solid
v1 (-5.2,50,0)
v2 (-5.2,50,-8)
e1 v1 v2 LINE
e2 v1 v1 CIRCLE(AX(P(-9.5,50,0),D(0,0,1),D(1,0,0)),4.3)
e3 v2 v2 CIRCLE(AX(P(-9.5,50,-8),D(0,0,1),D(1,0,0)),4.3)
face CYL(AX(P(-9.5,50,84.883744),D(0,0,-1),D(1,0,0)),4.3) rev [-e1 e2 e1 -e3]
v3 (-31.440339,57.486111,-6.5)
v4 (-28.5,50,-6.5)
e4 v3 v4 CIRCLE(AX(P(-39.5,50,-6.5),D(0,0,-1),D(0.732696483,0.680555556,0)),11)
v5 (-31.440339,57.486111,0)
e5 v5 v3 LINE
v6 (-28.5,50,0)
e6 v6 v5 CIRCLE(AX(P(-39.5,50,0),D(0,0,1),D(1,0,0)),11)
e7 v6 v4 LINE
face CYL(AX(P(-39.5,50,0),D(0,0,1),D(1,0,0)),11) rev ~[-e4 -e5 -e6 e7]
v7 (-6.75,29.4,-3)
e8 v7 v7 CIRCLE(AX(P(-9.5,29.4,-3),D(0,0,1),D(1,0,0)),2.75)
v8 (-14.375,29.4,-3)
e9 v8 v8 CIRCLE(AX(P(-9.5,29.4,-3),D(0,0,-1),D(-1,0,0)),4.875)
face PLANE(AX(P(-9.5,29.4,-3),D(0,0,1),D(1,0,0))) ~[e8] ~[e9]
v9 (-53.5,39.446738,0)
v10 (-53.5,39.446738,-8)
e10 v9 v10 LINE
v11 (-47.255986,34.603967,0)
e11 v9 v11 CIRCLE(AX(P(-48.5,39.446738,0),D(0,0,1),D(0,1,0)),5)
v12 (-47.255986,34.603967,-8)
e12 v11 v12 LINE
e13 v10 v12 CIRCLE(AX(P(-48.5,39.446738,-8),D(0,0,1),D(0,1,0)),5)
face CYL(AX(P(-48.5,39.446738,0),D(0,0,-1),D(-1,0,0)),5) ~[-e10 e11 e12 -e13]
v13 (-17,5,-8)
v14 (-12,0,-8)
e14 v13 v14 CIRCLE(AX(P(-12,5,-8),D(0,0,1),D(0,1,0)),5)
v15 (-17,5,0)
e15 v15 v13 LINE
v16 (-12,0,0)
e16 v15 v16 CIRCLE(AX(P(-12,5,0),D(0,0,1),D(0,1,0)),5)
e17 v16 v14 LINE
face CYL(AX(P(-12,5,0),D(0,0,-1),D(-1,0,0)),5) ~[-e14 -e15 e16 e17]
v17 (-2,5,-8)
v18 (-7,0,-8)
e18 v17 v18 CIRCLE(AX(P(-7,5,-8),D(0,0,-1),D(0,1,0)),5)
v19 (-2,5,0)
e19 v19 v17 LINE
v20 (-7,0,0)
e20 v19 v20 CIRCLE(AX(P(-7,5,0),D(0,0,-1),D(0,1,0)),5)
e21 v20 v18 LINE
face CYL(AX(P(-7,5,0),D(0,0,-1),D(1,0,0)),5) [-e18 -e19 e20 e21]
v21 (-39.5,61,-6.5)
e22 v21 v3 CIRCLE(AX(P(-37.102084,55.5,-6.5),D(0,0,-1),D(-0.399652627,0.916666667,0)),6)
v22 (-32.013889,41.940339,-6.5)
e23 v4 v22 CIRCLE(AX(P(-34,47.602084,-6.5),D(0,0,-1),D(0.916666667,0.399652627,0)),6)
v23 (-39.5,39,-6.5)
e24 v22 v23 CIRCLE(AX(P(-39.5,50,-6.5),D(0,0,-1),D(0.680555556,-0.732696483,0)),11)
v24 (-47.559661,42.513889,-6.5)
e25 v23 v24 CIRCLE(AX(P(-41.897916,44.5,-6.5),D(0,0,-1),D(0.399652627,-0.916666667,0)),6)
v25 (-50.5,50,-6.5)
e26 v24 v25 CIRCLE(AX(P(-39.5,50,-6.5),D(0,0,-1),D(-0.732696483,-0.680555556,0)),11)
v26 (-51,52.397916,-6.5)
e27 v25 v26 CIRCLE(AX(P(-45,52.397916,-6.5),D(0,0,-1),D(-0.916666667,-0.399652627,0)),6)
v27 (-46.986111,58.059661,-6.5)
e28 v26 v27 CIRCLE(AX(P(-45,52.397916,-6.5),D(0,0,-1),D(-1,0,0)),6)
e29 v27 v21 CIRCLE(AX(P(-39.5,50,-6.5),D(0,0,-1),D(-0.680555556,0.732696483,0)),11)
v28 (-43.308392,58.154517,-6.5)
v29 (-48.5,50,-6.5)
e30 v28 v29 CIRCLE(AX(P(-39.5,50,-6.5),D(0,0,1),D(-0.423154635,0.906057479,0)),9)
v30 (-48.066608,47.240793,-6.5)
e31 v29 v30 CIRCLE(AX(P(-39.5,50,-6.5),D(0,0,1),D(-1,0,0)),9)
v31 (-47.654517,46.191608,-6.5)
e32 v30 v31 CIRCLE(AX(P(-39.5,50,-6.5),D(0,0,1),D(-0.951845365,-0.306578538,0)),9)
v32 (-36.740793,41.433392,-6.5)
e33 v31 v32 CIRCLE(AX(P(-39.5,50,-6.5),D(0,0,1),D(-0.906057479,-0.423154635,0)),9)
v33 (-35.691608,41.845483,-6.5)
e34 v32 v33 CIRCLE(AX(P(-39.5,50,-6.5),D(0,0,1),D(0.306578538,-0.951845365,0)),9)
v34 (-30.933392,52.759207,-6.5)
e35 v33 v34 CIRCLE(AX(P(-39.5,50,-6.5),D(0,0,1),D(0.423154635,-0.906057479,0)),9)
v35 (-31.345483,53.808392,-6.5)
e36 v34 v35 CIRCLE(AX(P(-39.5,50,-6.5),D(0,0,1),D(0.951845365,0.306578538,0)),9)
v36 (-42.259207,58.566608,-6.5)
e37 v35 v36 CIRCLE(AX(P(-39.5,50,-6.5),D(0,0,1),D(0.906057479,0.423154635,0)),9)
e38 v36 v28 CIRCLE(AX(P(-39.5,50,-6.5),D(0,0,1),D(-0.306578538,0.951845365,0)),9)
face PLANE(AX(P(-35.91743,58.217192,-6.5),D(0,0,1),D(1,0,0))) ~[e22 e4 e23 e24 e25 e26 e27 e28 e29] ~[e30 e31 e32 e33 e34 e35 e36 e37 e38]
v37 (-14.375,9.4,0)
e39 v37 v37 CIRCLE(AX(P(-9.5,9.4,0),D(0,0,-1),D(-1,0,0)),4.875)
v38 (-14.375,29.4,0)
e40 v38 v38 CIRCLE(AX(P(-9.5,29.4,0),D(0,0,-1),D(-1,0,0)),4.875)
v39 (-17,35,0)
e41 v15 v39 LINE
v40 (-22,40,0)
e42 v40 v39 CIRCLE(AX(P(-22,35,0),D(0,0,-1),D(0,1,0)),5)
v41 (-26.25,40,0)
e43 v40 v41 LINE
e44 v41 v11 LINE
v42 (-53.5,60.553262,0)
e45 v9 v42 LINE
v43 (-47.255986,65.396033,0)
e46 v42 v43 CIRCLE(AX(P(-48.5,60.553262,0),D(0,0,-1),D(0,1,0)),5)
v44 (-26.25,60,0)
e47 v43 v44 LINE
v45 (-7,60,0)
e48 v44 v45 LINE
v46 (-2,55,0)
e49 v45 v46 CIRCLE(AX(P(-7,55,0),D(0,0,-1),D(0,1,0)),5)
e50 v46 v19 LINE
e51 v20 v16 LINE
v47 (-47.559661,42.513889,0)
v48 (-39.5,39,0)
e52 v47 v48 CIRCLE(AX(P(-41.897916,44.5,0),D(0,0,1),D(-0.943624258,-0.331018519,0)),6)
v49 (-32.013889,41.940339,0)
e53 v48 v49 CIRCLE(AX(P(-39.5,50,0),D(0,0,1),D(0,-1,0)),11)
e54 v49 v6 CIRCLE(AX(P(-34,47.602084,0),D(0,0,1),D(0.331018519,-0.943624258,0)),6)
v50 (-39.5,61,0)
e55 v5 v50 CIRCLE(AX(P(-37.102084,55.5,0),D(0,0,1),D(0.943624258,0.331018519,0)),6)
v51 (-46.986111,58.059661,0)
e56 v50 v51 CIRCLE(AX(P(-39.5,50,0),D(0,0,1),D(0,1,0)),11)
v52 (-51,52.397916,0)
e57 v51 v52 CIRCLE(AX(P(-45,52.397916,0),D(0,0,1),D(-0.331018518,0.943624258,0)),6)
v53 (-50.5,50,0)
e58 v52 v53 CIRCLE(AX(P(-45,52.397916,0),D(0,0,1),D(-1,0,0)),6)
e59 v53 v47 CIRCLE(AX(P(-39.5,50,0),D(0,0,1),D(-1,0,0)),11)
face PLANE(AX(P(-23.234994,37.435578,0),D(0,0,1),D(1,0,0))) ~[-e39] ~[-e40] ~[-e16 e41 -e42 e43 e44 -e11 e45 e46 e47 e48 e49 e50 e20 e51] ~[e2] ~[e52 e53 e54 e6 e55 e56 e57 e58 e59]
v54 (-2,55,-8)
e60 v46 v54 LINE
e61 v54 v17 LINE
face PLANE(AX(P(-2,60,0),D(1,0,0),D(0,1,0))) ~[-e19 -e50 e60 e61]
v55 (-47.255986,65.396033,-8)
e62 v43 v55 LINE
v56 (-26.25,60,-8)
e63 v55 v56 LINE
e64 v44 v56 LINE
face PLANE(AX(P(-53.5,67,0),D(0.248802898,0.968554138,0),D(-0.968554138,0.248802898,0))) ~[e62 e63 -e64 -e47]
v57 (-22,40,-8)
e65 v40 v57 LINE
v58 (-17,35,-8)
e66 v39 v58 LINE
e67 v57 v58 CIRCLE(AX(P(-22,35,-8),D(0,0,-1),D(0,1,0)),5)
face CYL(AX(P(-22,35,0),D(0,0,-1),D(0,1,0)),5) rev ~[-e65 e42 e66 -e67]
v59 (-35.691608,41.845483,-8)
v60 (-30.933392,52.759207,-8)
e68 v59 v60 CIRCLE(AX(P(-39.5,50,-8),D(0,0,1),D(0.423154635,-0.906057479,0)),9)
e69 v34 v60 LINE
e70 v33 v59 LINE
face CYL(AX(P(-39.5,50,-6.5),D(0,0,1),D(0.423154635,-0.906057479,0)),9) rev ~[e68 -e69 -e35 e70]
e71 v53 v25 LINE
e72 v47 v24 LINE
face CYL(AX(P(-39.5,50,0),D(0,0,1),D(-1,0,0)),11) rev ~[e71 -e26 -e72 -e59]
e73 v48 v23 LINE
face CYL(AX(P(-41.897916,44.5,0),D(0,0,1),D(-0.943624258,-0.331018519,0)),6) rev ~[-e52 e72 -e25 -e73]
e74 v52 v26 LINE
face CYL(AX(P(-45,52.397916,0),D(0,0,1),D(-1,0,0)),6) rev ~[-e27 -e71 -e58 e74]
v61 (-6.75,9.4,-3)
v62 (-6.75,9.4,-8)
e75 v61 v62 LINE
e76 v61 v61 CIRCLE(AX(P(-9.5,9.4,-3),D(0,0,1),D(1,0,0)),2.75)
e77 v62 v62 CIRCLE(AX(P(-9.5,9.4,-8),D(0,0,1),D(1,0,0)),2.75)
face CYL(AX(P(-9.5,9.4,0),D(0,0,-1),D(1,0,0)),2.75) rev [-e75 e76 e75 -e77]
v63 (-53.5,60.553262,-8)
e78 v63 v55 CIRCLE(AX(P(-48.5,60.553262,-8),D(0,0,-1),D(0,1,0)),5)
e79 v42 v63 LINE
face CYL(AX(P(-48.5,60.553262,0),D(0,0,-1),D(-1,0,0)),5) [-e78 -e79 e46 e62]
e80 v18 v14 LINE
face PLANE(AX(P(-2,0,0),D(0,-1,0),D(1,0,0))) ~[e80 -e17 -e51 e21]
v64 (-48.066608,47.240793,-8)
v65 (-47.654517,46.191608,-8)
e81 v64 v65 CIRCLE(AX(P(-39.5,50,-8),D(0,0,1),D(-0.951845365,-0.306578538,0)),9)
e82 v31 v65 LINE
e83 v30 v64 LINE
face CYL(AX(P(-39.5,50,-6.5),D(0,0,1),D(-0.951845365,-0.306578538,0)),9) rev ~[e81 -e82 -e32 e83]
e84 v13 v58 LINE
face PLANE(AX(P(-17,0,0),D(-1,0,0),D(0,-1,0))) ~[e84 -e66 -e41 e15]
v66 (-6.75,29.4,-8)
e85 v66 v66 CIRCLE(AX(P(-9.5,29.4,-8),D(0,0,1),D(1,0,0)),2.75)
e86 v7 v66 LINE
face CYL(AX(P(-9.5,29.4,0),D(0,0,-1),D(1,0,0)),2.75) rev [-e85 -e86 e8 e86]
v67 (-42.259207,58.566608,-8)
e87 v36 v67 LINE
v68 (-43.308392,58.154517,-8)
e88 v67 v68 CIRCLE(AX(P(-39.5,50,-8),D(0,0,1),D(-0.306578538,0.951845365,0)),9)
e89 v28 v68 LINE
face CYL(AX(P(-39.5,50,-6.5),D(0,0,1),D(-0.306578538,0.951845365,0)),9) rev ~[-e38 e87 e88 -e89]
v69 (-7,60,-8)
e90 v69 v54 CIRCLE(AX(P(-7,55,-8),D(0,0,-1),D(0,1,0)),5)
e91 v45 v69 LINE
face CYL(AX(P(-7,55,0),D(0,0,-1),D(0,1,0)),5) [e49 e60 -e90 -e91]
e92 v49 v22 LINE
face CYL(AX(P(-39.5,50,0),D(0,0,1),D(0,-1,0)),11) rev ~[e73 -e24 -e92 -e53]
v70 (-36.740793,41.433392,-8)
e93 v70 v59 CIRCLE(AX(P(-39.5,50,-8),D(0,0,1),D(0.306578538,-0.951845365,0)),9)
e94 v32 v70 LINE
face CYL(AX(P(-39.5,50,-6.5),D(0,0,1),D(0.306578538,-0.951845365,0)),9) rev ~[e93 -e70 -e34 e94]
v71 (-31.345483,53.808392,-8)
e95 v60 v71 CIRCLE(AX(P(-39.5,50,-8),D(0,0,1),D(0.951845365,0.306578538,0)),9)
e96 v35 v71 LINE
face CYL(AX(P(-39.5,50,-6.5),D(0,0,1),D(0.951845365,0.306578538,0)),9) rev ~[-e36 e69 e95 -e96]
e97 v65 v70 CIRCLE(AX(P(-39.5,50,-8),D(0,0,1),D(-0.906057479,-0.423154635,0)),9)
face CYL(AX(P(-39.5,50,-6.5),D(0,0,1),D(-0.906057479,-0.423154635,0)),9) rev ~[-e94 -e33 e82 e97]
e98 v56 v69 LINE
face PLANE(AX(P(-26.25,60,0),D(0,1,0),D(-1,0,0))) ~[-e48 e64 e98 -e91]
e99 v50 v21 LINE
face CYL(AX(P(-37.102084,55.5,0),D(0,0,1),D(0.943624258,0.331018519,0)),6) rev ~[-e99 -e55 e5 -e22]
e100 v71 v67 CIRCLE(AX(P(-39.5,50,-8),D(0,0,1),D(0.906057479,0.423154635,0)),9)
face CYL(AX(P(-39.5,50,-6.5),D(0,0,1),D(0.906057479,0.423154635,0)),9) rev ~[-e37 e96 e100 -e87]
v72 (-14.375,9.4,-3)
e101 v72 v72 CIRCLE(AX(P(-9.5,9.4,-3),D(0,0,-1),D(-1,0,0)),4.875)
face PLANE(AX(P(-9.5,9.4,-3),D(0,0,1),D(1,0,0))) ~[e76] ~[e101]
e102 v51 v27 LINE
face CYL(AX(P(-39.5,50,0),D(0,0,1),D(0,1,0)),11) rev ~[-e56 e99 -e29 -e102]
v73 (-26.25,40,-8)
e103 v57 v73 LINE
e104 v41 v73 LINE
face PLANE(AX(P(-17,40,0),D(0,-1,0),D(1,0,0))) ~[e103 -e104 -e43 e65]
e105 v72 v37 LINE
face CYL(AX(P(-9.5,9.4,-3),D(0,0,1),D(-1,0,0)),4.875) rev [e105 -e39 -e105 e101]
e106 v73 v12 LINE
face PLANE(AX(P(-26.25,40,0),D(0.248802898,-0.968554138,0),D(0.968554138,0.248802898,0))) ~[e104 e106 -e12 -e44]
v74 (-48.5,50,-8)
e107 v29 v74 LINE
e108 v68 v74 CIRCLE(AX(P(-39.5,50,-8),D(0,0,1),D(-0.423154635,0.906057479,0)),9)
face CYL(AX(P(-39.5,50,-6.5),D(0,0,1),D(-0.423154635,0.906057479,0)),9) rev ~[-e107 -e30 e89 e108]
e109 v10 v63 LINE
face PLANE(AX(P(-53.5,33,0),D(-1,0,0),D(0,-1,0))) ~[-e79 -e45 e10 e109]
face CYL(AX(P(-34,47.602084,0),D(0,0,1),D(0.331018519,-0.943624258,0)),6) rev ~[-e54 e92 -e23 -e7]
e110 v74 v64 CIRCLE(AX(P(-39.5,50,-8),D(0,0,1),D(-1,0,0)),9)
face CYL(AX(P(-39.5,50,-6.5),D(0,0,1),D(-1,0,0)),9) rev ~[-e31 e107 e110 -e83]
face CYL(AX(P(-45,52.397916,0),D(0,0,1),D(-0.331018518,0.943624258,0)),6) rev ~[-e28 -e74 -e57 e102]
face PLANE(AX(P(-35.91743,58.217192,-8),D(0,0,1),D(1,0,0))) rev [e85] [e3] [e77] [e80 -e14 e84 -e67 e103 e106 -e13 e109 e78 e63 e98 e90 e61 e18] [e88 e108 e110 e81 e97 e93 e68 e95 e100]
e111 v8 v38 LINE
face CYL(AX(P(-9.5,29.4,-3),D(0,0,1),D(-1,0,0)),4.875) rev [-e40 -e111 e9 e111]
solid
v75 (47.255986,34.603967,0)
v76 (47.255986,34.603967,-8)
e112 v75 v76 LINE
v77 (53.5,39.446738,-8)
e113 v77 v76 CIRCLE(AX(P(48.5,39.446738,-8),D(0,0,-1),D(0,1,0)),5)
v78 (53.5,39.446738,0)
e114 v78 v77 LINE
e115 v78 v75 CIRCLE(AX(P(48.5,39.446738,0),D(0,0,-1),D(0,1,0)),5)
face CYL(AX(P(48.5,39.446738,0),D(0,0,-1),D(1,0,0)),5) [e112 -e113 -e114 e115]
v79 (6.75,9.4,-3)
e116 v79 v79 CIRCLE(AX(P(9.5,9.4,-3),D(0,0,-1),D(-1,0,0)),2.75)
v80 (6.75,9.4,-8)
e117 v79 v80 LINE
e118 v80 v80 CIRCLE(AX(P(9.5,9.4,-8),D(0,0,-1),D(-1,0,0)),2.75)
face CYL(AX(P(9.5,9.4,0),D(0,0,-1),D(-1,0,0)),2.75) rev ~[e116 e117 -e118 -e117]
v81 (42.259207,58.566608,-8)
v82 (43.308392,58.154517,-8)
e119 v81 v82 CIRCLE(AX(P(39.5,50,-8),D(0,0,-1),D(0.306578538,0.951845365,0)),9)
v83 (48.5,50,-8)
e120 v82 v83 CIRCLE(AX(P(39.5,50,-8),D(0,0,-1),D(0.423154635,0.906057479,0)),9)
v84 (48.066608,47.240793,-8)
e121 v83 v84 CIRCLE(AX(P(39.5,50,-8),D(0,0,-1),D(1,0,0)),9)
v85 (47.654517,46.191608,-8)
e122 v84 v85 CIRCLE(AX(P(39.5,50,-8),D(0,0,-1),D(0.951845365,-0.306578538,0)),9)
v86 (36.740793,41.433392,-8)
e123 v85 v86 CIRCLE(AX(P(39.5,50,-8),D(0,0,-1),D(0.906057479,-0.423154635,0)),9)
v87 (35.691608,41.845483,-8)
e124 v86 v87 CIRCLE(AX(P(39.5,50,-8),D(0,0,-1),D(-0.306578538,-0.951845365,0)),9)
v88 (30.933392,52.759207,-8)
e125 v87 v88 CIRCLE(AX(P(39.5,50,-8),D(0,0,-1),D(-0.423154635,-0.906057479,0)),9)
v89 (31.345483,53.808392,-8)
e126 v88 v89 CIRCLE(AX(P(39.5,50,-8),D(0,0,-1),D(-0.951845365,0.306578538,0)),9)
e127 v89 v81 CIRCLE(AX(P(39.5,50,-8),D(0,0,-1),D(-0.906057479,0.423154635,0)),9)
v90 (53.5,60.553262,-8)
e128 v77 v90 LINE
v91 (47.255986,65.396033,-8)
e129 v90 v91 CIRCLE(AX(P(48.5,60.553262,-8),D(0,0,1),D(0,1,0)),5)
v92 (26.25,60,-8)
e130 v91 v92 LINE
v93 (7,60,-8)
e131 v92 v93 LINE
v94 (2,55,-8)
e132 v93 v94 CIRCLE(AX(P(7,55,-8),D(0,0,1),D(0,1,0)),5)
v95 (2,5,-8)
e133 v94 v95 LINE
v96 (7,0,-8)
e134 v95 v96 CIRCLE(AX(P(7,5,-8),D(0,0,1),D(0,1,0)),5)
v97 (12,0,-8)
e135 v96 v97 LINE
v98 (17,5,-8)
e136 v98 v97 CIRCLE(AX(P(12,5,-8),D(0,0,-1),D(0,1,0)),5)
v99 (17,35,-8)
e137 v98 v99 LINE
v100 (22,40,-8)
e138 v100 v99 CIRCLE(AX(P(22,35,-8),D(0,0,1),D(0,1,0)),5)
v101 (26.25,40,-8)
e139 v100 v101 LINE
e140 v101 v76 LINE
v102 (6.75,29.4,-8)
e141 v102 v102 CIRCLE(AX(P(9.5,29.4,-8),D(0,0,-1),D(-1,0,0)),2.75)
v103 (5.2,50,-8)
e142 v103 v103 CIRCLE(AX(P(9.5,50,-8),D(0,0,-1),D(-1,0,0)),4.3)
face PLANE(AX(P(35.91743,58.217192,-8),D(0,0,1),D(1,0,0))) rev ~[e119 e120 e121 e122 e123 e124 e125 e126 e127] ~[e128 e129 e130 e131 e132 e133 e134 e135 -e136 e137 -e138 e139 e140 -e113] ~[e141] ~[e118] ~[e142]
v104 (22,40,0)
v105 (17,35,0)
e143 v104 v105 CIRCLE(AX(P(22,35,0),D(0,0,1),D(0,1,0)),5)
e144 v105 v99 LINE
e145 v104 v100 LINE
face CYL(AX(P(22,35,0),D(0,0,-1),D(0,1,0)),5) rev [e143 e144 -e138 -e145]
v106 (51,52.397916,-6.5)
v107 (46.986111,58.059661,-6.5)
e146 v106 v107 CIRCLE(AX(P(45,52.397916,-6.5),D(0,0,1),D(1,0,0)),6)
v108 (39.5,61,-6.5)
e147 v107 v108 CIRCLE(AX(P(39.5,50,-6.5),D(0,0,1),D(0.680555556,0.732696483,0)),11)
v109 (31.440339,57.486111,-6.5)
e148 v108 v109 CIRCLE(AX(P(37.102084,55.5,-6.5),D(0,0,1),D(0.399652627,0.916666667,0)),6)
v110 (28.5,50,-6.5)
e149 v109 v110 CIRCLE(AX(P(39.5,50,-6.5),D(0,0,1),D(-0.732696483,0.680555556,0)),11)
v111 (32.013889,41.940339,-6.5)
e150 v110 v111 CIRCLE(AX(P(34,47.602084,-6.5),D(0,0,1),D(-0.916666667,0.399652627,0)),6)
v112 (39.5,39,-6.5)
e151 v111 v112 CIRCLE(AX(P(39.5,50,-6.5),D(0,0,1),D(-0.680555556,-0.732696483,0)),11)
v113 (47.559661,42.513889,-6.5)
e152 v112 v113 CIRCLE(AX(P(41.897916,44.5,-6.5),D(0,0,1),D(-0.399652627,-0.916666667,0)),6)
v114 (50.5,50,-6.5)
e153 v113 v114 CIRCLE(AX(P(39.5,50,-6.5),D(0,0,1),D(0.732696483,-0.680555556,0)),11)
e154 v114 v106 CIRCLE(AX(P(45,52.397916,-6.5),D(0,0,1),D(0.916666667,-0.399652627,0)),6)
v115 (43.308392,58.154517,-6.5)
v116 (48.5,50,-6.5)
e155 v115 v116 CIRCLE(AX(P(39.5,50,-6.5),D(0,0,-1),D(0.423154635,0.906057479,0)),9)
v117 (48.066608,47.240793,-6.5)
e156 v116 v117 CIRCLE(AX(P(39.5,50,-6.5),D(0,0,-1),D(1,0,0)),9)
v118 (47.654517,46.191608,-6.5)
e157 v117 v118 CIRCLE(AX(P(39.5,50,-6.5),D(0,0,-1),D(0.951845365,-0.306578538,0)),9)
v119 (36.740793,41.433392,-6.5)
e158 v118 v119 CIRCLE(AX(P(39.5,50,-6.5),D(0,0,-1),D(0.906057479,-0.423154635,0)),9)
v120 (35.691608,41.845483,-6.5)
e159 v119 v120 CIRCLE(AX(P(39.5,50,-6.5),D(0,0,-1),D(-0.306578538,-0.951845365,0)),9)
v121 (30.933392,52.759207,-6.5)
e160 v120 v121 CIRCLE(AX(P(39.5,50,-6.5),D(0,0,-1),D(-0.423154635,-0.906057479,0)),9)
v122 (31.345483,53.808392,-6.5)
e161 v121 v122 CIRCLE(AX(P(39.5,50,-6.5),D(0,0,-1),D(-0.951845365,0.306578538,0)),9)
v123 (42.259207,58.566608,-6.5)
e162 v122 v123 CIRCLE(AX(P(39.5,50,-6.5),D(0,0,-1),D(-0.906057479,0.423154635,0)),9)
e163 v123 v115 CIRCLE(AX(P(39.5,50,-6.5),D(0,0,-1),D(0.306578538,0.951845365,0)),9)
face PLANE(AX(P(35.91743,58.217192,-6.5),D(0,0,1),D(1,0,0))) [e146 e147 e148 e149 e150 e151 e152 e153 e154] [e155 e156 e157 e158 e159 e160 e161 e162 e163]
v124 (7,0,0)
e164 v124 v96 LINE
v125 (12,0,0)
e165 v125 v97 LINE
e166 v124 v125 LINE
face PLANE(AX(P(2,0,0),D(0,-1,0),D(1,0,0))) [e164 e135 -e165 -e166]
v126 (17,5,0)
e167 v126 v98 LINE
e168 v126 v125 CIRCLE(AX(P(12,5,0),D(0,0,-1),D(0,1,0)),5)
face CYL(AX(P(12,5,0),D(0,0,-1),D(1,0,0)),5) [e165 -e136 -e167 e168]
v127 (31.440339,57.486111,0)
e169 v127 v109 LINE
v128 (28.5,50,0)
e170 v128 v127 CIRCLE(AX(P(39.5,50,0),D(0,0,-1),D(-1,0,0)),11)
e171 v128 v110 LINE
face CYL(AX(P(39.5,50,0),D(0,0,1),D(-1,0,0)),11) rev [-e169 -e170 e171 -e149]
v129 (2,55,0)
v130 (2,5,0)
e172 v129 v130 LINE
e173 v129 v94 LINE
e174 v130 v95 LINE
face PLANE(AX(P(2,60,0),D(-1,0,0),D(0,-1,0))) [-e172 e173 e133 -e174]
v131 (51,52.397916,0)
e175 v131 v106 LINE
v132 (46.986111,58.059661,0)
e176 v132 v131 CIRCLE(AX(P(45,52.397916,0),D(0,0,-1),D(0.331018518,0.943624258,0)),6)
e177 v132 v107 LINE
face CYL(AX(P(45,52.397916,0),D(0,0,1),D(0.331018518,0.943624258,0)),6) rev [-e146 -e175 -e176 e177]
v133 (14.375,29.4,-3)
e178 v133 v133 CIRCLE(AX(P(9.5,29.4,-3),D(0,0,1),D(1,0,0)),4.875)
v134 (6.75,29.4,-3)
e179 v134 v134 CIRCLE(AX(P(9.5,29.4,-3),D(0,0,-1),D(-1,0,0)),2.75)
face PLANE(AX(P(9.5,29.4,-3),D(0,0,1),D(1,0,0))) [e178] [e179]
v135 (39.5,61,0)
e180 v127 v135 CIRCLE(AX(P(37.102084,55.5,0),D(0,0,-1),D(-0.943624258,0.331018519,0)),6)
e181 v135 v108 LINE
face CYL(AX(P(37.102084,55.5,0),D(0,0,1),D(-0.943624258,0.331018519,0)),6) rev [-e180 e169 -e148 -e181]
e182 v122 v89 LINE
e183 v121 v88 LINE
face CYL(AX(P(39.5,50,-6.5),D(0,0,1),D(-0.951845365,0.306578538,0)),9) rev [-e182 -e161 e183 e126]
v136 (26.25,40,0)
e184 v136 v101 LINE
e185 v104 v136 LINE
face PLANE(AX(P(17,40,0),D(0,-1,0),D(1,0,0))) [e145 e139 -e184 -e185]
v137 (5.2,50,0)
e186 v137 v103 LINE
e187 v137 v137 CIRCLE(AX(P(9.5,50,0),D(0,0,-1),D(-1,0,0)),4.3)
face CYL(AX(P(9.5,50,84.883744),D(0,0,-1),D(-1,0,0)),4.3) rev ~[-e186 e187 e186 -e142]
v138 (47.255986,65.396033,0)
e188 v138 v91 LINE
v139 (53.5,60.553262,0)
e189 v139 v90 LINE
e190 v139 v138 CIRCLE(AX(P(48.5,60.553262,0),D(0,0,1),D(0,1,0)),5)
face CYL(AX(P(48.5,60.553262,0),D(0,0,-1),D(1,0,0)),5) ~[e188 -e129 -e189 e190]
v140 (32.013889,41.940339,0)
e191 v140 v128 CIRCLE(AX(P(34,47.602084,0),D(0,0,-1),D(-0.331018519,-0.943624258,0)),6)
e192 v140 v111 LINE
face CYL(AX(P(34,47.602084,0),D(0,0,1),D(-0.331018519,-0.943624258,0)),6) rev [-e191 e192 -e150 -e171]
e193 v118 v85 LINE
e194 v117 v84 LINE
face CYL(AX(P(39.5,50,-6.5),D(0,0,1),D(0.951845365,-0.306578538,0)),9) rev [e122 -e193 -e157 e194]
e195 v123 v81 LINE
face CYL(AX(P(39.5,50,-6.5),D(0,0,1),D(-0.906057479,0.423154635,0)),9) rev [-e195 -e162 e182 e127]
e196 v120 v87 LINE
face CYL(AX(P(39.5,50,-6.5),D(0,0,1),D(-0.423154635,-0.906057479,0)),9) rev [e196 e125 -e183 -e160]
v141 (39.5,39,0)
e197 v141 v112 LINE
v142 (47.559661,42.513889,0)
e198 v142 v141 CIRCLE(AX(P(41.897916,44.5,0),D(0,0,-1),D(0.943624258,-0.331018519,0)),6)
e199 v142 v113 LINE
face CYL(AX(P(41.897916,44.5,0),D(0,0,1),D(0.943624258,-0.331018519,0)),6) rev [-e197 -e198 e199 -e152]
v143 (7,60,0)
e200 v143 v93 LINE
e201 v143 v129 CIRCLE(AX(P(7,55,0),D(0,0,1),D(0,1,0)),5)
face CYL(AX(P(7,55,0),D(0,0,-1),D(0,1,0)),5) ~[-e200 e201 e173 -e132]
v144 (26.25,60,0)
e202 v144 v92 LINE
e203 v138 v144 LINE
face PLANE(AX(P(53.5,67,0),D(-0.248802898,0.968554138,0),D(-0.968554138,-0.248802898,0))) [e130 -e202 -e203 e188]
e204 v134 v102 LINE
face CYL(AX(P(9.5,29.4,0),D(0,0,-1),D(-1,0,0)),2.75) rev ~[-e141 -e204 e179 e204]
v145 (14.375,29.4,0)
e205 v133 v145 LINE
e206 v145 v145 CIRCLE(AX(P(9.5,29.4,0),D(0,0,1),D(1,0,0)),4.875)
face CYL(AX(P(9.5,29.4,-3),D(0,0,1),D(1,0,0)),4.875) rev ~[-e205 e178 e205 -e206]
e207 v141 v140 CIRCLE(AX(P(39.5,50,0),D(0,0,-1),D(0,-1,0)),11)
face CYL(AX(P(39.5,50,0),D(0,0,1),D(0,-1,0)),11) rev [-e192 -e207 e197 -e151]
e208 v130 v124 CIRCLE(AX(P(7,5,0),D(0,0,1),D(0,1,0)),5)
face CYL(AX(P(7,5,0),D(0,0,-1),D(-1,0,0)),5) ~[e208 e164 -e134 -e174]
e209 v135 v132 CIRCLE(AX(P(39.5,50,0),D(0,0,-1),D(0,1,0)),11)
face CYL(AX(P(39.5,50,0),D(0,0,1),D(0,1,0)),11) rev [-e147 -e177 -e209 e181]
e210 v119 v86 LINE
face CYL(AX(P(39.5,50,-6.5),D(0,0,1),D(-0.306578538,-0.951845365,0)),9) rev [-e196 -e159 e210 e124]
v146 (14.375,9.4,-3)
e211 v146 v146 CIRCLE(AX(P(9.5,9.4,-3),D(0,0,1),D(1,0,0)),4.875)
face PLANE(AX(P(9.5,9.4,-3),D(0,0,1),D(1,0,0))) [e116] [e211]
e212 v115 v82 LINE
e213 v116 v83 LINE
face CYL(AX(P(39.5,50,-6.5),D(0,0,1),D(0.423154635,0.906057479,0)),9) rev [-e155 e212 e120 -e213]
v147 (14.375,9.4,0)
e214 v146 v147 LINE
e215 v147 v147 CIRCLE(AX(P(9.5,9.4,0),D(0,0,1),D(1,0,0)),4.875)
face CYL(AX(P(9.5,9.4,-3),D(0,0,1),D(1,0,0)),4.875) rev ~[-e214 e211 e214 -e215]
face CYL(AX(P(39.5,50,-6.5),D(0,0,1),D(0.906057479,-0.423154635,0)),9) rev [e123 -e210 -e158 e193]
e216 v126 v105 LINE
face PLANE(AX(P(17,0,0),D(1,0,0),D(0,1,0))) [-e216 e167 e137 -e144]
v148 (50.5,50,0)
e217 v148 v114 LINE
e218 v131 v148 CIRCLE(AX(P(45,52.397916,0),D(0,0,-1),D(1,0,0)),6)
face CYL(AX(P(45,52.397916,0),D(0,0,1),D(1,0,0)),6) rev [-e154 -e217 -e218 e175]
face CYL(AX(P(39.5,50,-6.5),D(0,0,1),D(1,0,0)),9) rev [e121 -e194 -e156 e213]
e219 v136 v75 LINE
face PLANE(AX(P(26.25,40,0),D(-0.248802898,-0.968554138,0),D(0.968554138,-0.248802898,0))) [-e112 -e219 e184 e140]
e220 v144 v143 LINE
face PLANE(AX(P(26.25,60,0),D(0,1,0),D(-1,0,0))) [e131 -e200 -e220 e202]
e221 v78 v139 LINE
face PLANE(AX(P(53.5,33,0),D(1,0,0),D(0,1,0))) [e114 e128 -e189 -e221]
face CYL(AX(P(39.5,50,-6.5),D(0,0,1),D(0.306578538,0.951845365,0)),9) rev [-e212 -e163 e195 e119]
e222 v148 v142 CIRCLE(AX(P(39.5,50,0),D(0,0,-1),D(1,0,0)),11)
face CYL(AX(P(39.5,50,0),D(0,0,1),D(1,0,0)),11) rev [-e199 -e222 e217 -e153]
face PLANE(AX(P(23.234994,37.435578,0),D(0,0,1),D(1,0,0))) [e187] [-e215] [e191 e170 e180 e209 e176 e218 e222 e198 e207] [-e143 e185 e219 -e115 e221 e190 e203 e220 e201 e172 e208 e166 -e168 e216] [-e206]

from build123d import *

# Parameters (mm, degrees)
F1_DEPTH       = 8
F2_D           = 8.6
F3_D           = 5.5
F3_CBORE_D     = 9.75
F3_CBORE_DEPTH = 3
F4_R           = 5
F5_START       = -6.5
F5_DEPTH       = 1.5


# Not quite as in the source:
# - a feature names something its author has since deleted; it is built from what else it names


with BuildPart() as f1:
    # F0 (on Top) → F1 (new body)
    with BuildSketch(Plane.XY):
        Polygon((53.5, 33), (53.5, 67), (26.25, 60), (2, 60), (2, 40), (2, 0), (17, 0), (17, 40), (26.25, 40), align=None)
        with BuildLine():
            ThreePointArc((51, 52.3979157617), (50.8736700622, 51.1731708903), (50.5, 50))
            ThreePointArc((50.5, 50), (49.7385612859, 45.978574532), (47.55966131, 42.5138888889))
            ThreePointArc((47.55966131, 42.5138888889), (44.2958315233, 39), (39.5, 39))
            ThreePointArc((39.5, 39), (35.478574532, 39.7614387141), (32.0138888889, 41.94033869))
            ThreePointArc((32.0138888889, 41.94033869), (28.5, 45.2041684767), (28.5, 50))
            ThreePointArc((28.5, 50), (29.2614387141, 54.021425468), (31.44033869, 57.4861111111))
            ThreePointArc((31.44033869, 57.4861111111), (34.7041684767, 61), (39.5, 61))
            ThreePointArc((39.5, 61), (43.521425468, 60.2385612859), (46.9861111111, 58.05966131))
            ThreePointArc((46.9861111111, 58.05966131), (49.8947250519, 55.8680262306), (51, 52.3979157617))
        make_face(mode=Mode.SUBTRACT)
    extrude(amount=-F1_DEPTH)

    # F2 (through all)
    with Locations(Plane.XY):
        with Locations((9.5, 50)):
            Hole(F2_D / 2)

    # F3 (through all)
    with Locations(Plane.XY):
        with Locations((9.5, 29.4), (9.5, 9.4)):
            CounterBoreHole(F3_D / 2, F3_CBORE_D / 2, F3_CBORE_DEPTH)

    # F4
    f4_edges = [f1.edges().sort_by_distance(p)[0] for p in [
        (17, 0, -4),
        (2, 60, -4),
        (53.5, 33, -4),
        (53.5, 67, -4),
        (17, 40, -4),
        (2, 0, -4),
    ]]
    fillet(f4_edges, radius=F4_R)

    # F0 (on Top) → F5 (join)
    with BuildSketch(Plane.XY.offset(F5_START)):
        with BuildLine():
            ThreePointArc((42.2592068472, 58.5666082888), (41.0707112049, 60), (39.5, 61))
            ThreePointArc((39.5, 61), (35.1038211036, 60.0833333333), (31.44033869, 57.4861111111))
            ThreePointArc((31.44033869, 57.4861111111), (31.104078936, 55.6547009803), (31.3454826891, 53.8083917112))
            ThreePointArc((31.3454826891, 53.8083917112), (35.9031263575, 58.25), (42.2592068472, 58.5666082888))
        make_face()
        with BuildLine():
            ThreePointArc((31.44033869, 57.4861111111), (35.1038211036, 60.0833333333), (39.5, 61))
            ThreePointArc((39.5, 61), (34.7041684767, 61), (31.44033869, 57.4861111111))
        make_face()
        with BuildLine():
            ThreePointArc((43.3083917112, 58.1545173109), (45.1547009803, 58.395921064), (46.9861111111, 58.05966131))
            ThreePointArc((46.9861111111, 58.05966131), (43.521425468, 60.2385612859), (39.5, 61))
            ThreePointArc((39.5, 61), (41.0707112049, 60), (42.2592068472, 58.5666082888))
            ThreePointArc((42.2592068472, 58.5666082888), (42.7902572011, 58.3770046885), (43.3083917112, 58.1545173109))
        make_face()
        with BuildLine():
            ThreePointArc((48.0666082888, 47.2407931528), (49.5, 48.4292887951), (50.5, 50))
            ThreePointArc((50.5, 50), (49.5833333333, 54.3961788964), (46.9861111111, 58.05966131))
            ThreePointArc((46.9861111111, 58.05966131), (45.1547009803, 58.395921064), (43.3083917112, 58.1545173109))
            ThreePointArc((43.3083917112, 58.1545173109), (47.0919538131, 54.8334498342), (48.5, 50))
            ThreePointArc((48.5, 50), (48.3909919188, 48.603481937), (48.0666082888, 47.2407931528))
        make_face()
        with BuildLine():
            ThreePointArc((46.9861111111, 58.05966131), (49.5833333333, 54.3961788964), (50.5, 50))
            ThreePointArc((50.5, 50), (50.8736700622, 51.1731708903), (51, 52.3979157617))
            ThreePointArc((51, 52.3979157617), (49.8947250519, 55.8680262306), (46.9861111111, 58.05966131))
        make_face()
        with BuildLine():
            ThreePointArc((47.55966131, 42.5138888889), (49.7385612859, 45.978574532), (50.5, 50))
            ThreePointArc((50.5, 50), (49.5, 48.4292887951), (48.0666082888, 47.2407931528))
            ThreePointArc((48.0666082888, 47.2407931528), (47.8770046885, 46.7097427989), (47.6545173109, 46.1916082888))
            ThreePointArc((47.6545173109, 46.1916082888), (47.8367544232, 45.3545146881), (47.8979157617, 44.5))
            ThreePointArc((47.8979157617, 44.5), (47.8127476819, 43.4926453678), (47.55966131, 42.5138888889))
        make_face()
        with BuildLine():
            ThreePointArc((39.5, 39), (43.8961788964, 39.9166666667), (47.55966131, 42.5138888889))
            ThreePointArc((47.55966131, 42.5138888889), (47.8127476819, 43.4926453678), (47.8979157617, 44.5))
            ThreePointArc((47.8979157617, 44.5), (47.8367544232, 45.3545146881), (47.6545173109, 46.1916082888))
            ThreePointArc((47.6545173109, 46.1916082888), (43.0968736425, 41.75), (36.7407931528, 41.4333917112))
            ThreePointArc((36.7407931528, 41.4333917112), (37.9292887951, 40), (39.5, 39))
        make_face()
        with BuildLine():
            ThreePointArc((39.5, 39), (44.2958315233, 39), (47.55966131, 42.5138888889))
            ThreePointArc((47.55966131, 42.5138888889), (43.8961788964, 39.9166666667), (39.5, 39))
        make_face()
        with BuildLine():
            ThreePointArc((32.0138888889, 41.94033869), (35.478574532, 39.7614387141), (39.5, 39))
            ThreePointArc((39.5, 39), (37.9292887951, 40), (36.7407931528, 41.4333917112))
            ThreePointArc((36.7407931528, 41.4333917112), (36.2097427989, 41.6229953115), (35.6916082888, 41.8454826891))
            ThreePointArc((35.6916082888, 41.8454826891), (33.8452990197, 41.604078936), (32.0138888889, 41.94033869))
        make_face()
        with BuildLine():
            ThreePointArc((28.5, 50), (29.4166666667, 45.6038211036), (32.0138888889, 41.94033869))
            ThreePointArc((32.0138888889, 41.94033869), (33.8452990197, 41.604078936), (35.6916082888, 41.8454826891))
            ThreePointArc((35.6916082888, 41.8454826891), (31.25, 46.4031263575), (30.9333917112, 52.7592068472))
            ThreePointArc((30.9333917112, 52.7592068472), (29.5, 51.5707112049), (28.5, 50))
        make_face()
        with BuildLine():
            ThreePointArc((28.5, 50), (28.5, 45.2041684767), (32.0138888889, 41.94033869))
            ThreePointArc((32.0138888889, 41.94033869), (29.4166666667, 45.6038211036), (28.5, 50))
        make_face()
        with BuildLine():
            ThreePointArc((31.3454826891, 53.8083917112), (31.104078936, 55.6547009803), (31.44033869, 57.4861111111))
            ThreePointArc((31.44033869, 57.4861111111), (29.2614387141, 54.021425468), (28.5, 50))
            ThreePointArc((28.5, 50), (29.5, 51.5707112049), (30.9333917112, 52.7592068472))
            ThreePointArc((30.9333917112, 52.7592068472), (31.1229953115, 53.2902572011), (31.3454826891, 53.8083917112))
        make_face()
    extrude(amount=-F5_DEPTH)


with BuildPart() as f6_1:
    # F6: instance of F1
    add(f1.part.mirror(Plane.YZ))


solid = Compound([f1.part, f6_1.part])
